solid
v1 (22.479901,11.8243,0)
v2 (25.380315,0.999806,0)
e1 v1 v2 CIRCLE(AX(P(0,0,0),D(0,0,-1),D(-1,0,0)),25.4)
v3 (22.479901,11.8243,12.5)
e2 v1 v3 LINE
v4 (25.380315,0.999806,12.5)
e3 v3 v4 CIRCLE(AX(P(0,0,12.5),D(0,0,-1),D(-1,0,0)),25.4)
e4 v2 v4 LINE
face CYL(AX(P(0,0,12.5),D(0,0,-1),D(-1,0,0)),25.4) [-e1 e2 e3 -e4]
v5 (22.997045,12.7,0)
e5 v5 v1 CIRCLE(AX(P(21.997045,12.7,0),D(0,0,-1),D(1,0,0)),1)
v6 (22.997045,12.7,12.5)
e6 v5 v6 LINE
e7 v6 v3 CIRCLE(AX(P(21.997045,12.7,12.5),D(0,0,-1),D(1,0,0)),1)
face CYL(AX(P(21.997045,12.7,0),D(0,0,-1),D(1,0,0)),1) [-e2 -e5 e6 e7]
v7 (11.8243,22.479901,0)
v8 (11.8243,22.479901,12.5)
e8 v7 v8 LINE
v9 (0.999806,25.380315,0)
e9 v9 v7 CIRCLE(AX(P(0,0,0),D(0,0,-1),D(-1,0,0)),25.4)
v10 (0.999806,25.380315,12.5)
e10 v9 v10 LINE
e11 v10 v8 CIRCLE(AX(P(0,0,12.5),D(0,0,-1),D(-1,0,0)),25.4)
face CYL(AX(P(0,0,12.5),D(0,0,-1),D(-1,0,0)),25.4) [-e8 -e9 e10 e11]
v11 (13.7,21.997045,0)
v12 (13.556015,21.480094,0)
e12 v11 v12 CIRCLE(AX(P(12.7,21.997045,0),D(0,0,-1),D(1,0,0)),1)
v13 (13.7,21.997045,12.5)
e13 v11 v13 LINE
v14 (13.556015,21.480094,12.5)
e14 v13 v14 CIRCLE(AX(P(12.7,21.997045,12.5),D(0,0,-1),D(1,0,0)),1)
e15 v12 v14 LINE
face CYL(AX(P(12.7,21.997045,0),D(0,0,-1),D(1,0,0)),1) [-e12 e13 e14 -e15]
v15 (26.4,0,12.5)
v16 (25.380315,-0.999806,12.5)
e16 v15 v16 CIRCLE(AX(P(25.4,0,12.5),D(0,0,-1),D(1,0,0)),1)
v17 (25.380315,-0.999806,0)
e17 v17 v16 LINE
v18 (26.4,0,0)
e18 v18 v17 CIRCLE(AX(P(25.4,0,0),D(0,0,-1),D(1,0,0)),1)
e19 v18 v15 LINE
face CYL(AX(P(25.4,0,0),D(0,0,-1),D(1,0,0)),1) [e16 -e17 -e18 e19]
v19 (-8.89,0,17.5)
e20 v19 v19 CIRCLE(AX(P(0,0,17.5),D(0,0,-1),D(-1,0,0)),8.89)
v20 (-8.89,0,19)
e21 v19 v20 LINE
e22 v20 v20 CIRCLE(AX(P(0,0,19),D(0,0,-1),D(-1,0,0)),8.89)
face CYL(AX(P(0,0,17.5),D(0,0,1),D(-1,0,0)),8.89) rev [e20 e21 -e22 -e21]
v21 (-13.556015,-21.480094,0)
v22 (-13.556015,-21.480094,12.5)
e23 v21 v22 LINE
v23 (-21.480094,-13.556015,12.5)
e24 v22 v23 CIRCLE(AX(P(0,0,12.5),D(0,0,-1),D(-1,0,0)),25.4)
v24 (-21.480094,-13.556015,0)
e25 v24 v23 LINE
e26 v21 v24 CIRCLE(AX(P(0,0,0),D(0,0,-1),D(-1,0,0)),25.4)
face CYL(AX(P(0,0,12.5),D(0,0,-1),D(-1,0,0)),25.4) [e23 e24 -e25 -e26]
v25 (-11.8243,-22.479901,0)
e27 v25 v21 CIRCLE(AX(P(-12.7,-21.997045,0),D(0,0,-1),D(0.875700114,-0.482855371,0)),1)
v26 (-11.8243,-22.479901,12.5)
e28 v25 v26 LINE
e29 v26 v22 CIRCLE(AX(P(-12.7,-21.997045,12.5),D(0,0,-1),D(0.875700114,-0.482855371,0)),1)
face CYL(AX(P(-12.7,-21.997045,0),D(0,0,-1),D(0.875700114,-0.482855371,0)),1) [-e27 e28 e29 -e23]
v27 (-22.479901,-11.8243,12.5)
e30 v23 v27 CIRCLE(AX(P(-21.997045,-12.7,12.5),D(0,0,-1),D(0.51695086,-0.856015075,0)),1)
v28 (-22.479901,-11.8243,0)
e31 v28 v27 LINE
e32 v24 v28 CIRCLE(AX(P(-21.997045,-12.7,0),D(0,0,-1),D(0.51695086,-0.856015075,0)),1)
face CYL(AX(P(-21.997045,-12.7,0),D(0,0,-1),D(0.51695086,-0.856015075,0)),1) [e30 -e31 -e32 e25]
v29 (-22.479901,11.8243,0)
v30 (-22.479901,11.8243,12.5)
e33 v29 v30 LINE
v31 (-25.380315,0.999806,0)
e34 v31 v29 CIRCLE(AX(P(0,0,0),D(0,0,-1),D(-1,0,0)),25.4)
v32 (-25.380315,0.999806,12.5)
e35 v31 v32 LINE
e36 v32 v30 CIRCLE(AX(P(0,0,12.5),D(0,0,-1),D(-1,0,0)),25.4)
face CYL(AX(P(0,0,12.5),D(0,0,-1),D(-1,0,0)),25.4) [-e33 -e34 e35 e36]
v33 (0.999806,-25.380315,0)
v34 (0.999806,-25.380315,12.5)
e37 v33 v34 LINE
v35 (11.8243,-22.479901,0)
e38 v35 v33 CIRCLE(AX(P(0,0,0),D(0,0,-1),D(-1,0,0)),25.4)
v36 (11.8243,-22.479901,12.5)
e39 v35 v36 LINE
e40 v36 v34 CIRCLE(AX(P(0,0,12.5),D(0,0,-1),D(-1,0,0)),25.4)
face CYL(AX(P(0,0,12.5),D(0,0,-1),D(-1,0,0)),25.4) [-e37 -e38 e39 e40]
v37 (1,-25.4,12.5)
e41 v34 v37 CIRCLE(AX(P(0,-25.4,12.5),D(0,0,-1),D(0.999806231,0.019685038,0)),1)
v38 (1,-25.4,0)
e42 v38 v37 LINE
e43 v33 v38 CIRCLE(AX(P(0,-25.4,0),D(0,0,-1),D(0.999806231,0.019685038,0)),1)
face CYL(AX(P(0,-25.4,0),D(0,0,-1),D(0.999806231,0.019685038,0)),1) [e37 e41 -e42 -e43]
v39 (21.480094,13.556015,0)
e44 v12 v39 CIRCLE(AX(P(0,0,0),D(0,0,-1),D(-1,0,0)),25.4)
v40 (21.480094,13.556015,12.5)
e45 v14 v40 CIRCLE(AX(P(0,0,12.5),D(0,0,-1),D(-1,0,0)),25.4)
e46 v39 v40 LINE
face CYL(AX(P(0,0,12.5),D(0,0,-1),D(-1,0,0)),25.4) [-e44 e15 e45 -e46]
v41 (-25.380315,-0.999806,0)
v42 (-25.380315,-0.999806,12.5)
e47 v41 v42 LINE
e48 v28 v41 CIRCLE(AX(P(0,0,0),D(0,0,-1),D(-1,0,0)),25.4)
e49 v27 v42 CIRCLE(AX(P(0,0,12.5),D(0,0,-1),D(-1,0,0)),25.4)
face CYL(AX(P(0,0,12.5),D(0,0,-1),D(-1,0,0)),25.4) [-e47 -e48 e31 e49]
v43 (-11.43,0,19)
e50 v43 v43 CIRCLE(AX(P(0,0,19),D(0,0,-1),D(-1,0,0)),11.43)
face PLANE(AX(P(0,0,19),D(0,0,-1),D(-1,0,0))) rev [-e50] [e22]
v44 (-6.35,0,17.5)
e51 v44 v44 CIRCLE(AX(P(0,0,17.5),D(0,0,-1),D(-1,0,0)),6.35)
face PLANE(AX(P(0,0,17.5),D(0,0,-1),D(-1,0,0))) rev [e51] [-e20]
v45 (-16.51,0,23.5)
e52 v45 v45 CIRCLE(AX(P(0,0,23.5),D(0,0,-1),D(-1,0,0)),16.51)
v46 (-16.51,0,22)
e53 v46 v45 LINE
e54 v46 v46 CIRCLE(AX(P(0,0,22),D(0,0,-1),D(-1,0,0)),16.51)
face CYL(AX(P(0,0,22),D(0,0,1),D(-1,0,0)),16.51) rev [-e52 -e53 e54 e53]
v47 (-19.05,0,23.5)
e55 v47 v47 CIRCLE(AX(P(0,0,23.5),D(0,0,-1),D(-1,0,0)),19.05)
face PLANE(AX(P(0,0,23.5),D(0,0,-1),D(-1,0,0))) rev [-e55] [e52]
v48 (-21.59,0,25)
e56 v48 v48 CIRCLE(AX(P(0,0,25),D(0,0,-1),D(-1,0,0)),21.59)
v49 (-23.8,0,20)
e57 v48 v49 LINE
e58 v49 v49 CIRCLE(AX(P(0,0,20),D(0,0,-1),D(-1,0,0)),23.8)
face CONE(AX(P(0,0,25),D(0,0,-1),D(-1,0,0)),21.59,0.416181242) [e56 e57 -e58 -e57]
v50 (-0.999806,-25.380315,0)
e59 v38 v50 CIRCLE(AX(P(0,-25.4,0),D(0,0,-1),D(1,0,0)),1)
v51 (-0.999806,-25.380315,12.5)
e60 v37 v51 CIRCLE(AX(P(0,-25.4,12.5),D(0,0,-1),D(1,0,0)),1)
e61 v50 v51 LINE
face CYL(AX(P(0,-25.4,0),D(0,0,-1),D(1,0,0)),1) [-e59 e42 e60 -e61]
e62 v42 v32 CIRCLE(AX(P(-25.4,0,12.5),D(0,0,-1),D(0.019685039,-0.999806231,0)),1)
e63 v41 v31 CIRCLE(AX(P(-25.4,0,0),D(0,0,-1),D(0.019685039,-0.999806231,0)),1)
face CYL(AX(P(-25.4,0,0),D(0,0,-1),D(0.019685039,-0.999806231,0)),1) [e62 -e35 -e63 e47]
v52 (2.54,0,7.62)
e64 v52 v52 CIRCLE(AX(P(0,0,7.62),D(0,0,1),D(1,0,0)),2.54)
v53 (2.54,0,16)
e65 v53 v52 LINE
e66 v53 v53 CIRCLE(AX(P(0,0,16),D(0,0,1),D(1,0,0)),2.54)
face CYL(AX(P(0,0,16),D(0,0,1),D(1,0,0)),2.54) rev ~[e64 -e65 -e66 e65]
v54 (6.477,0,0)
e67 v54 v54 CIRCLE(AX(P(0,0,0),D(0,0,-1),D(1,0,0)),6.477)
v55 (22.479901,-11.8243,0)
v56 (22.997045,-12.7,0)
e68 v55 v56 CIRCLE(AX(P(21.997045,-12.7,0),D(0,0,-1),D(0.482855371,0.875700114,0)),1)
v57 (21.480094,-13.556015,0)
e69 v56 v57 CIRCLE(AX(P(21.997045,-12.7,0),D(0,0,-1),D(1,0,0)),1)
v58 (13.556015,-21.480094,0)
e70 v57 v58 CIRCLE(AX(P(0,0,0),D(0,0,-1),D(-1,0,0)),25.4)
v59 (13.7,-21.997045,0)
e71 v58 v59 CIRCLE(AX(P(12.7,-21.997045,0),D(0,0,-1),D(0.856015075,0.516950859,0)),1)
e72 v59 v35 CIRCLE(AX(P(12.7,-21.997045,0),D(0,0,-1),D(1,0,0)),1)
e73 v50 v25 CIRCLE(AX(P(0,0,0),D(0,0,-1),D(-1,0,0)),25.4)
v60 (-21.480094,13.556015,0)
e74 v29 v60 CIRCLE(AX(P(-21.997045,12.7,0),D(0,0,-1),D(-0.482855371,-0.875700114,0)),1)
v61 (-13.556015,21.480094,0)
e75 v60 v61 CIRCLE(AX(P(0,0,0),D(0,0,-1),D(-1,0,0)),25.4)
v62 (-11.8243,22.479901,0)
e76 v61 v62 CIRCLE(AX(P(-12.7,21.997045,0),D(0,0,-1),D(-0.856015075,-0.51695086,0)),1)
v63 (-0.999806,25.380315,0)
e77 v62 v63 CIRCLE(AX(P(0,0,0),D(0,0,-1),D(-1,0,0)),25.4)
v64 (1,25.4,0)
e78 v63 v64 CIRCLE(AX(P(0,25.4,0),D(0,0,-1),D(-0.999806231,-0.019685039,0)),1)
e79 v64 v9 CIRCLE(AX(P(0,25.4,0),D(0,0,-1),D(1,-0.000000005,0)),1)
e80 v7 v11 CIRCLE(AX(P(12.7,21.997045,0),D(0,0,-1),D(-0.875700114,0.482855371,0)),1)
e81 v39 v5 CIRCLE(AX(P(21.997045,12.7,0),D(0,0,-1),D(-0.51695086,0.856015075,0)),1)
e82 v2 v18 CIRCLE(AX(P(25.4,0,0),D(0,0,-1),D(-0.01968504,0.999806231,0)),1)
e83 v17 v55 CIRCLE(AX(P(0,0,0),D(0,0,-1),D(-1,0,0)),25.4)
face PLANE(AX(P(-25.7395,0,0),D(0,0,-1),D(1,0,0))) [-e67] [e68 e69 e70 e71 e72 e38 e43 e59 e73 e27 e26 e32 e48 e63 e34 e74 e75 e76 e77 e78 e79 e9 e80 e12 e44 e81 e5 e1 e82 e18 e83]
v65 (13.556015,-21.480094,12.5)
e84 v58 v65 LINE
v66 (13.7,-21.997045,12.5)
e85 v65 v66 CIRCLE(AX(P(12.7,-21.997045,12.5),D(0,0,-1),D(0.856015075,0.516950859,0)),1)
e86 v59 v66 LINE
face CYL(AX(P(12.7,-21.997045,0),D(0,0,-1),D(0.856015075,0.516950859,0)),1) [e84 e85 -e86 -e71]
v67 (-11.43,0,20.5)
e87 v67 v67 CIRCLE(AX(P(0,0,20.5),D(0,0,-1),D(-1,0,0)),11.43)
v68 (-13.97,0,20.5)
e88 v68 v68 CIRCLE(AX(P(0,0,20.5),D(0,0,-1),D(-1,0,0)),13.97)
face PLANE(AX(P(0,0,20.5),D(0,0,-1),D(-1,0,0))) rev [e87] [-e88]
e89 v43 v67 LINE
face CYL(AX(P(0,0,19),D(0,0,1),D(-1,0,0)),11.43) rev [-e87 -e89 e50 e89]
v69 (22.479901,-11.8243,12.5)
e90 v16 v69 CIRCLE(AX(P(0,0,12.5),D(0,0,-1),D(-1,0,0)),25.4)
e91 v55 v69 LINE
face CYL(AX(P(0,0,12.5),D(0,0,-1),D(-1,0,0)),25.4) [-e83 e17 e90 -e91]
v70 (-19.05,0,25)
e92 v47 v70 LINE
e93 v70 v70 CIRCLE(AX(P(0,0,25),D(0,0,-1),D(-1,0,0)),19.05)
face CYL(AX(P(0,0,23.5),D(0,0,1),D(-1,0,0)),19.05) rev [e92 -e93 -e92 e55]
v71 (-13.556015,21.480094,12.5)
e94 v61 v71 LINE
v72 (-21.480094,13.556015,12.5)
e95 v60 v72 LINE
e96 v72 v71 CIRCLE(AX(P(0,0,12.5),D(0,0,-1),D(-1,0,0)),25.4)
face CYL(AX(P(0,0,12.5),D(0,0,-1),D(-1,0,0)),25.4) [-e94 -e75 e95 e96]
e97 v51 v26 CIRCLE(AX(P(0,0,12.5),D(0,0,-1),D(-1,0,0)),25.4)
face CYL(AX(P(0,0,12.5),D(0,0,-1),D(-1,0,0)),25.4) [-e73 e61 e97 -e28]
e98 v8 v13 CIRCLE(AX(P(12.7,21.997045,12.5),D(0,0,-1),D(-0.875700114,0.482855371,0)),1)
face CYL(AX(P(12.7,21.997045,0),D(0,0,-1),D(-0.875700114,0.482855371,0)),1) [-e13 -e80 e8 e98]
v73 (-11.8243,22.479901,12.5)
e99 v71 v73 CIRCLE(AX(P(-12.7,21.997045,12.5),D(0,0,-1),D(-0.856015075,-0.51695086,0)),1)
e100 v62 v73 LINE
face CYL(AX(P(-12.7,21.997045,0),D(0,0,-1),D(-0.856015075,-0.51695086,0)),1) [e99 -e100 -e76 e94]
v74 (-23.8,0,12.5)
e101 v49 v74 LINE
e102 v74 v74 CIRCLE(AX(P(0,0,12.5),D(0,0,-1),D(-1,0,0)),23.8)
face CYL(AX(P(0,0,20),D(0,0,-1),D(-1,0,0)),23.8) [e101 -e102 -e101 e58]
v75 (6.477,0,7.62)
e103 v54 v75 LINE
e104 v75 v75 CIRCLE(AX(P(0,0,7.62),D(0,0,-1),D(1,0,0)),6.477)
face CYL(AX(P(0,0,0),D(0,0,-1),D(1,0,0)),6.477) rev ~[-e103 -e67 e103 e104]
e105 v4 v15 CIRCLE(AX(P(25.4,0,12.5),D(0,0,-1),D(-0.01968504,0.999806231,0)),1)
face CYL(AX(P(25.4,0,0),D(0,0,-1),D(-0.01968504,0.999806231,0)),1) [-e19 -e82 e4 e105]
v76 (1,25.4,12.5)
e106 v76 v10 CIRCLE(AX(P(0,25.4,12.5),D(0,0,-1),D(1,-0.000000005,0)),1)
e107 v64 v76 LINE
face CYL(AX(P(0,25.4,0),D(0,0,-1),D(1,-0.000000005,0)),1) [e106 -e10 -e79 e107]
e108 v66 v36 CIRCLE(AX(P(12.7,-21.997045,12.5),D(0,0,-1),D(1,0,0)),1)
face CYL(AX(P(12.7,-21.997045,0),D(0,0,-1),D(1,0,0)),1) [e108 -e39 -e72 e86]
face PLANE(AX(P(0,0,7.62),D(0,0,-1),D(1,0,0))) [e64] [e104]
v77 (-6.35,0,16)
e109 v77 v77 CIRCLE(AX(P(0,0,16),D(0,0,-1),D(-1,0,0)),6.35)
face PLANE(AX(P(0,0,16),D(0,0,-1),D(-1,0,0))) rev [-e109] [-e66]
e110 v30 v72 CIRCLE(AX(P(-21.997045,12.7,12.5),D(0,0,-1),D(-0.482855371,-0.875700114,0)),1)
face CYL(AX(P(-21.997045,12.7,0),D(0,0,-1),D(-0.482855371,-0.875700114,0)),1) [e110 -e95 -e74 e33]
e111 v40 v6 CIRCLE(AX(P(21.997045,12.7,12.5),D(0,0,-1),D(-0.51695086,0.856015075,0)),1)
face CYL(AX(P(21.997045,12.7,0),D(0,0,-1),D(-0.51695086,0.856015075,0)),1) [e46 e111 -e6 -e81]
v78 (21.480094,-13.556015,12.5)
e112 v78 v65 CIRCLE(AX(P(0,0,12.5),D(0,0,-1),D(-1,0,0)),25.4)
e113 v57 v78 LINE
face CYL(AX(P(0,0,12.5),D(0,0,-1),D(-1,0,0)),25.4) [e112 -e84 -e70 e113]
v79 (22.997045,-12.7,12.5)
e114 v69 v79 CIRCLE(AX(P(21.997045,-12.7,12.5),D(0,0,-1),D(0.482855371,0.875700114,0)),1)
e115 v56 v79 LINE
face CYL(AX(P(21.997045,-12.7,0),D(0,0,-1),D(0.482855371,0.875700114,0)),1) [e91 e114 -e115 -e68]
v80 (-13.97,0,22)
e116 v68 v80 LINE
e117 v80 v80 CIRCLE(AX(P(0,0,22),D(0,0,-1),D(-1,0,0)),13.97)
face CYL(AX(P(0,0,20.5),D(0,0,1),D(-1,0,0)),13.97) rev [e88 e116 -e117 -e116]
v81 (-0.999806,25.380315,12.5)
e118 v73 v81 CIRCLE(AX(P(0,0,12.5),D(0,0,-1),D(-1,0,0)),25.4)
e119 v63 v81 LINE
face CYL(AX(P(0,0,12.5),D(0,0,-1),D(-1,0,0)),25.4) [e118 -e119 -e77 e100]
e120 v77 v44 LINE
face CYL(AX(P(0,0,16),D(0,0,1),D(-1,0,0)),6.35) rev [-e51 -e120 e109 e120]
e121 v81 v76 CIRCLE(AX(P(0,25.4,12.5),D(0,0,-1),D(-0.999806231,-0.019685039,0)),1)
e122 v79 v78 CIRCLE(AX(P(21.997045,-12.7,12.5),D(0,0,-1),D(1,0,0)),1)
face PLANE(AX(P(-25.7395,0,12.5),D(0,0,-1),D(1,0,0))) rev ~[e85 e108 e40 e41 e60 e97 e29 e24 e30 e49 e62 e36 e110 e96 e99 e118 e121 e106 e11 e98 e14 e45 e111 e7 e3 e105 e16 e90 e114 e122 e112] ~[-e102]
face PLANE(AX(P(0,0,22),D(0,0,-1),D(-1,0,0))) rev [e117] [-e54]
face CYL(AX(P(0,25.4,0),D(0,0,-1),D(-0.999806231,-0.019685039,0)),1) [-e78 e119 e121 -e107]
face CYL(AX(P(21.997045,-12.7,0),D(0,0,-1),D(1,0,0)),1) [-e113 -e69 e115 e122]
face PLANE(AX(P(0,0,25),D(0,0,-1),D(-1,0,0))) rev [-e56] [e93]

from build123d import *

# Parameters (mm, degrees)
F3_DEPTH = 12.5
F2_R     = 6.477
F4_DEPTH = 7.62
F5_R     = 2.54
F6_DEPTH = 25.4


with BuildPart() as f1:
    # F0 (on Front) → F1 (revolve)
    with BuildSketch(Plane.XZ):
        Polygon((-25.4, 0), (0, 0), (0, 16), (-6.35, 16), (-6.35, 17.5), (-8.89, 17.5), (-8.89, 19), (-11.43, 19), (-11.43, 20.5), (-13.97, 20.5), (-13.97, 22), (-16.51, 22), (-16.51, 23.5), (-19.05, 23.5), (-19.05, 25), (-21.59, 25), (-23.8, 20), (-23.8, 12.5), (-25.4, 12.5), align=None)
    revolve(axis=Axis((0, 0, 8), (0, 0, -1)))

    # F2 (on face) → F3 (join)
    with BuildSketch(Plane(origin=(0, 0, 0), x_dir=(1, 0, 0), z_dir=(0, 0, -1))):
        with BuildLine():
            ThreePointArc((-25.3803149606, -0.9998062308), (-25.4, 0), (-25.3803149606, 0.9998062308))
            ThreePointArc((-25.3803149606, 0.9998062308), (-26.4, 0), (-25.3803149606, -0.9998062308))
        make_face()
        with BuildLine():
            ThreePointArc((-21.4800943965, 13.5560150751), (-21.9970452561, 12.7), (-22.4799006274, 11.8242998855))
            ThreePointArc((-22.4799006274, 11.8242998855), (-21.4885451928, 11.8389380477), (-20.9970452561, 12.7))
            ThreePointArc((-20.9970452561, 12.7), (-21.1261403074, 13.1914514932), (-21.4800943965, 13.5560150751))
        make_face()
        with BuildLine():
            ThreePointArc((-21.4800943965, 13.5560150751), (-22.8630706599, 13.2), (-22.4799006274, 11.8242998855))
            ThreePointArc((-22.4799006274, 11.8242998855), (-21.9970452561, 12.7), (-21.4800943965, 13.5560150751))
        make_face()
        with BuildLine():
            ThreePointArc((-21.4800943965, -13.5560150751), (-21.9970452561, -12.7), (-22.4799006274, -11.8242998855))
            ThreePointArc((-22.4799006274, -11.8242998855), (-22.8630706599, -13.2), (-21.4800943965, -13.5560150751))
        make_face()
        with BuildLine():
            ThreePointArc((-11.8242998855, 22.4799006274), (-12.7, 21.9970452561), (-13.5560150751, 21.4800943965))
            ThreePointArc((-13.5560150751, 21.4800943965), (-12.4316858884, 21.0337137776), (-11.7, 21.9970452561))
            ThreePointArc((-11.7, 21.9970452561), (-11.7315734115, 22.2463441586), (-11.8242998855, 22.4799006274))
        make_face()
        with BuildLine():
            ThreePointArc((-11.8242998855, 22.4799006274), (-13.2, 22.8630706599), (-13.5560150751, 21.4800943965))
            ThreePointArc((-13.5560150751, 21.4800943965), (-12.7, 21.9970452561), (-11.8242998855, 22.4799006274))
        make_face()
        with BuildLine():
            ThreePointArc((-11.8242998855, -22.4799006274), (-12.7, -21.9970452561), (-13.5560150751, -21.4800943965))
            ThreePointArc((-13.5560150751, -21.4800943965), (-13.2, -22.8630706599), (-11.8242998855, -22.4799006274))
        make_face()
        with BuildLine():
            ThreePointArc((0.9998062308, 25.3803149606), (0, 25.4), (-0.9998062308, 25.3803149606))
            ThreePointArc((-0.9998062308, 25.3803149606), (0, 24.4), (0.9998062308, 25.3803149606))
        make_face()
        with BuildLine():
            ThreePointArc((1, 25.4), (-0.0098429965, 26.3999515565), (-0.9998062308, 25.3803149606))
            ThreePointArc((-0.9998062308, 25.3803149606), (0, 25.4), (0.9998062308, 25.3803149606))
            ThreePointArc((0.9998062308, 25.3803149606), (0.9999515565, 25.3901570035), (1, 25.4))
        make_face()
        with BuildLine():
            ThreePointArc((0.9998062308, -25.3803149606), (0, -25.4), (-0.9998062308, -25.3803149606))
            ThreePointArc((-0.9998062308, -25.3803149606), (-0.0098429965, -26.3999515565), (1, -25.4))
            ThreePointArc((1, -25.4), (0.9999515565, -25.3901570035), (0.9998062308, -25.3803149606))
        make_face()
        with BuildLine():
            ThreePointArc((13.5560150751, 21.4800943965), (12.7, 21.9970452561), (11.8242998855, 22.4799006274))
            ThreePointArc((11.8242998855, 22.4799006274), (12.2, 21.1310198523), (13.5560150751, 21.4800943965))
        make_face()
        with BuildLine():
            ThreePointArc((13.7, 21.9970452561), (12.9492989025, 22.9654718446), (11.8242998855, 22.4799006274))
            ThreePointArc((11.8242998855, 22.4799006274), (12.7, 21.9970452561), (13.5560150751, 21.4800943965))
            ThreePointArc((13.5560150751, 21.4800943965), (13.6633314785, 21.7287311446), (13.7, 21.9970452561))
        make_face()
        with BuildLine():
            ThreePointArc((13.5560150751, -21.4800943965), (12.7, -21.9970452561), (11.8242998855, -22.4799006274))
            ThreePointArc((11.8242998855, -22.4799006274), (12.9492989025, -22.9654718446), (13.7, -21.9970452561))
            ThreePointArc((13.7, -21.9970452561), (13.6633314785, -21.7287311446), (13.5560150751, -21.4800943965))
        make_face()
        with BuildLine():
            ThreePointArc((22.4799006274, 11.8242998855), (21.9970452561, 12.7), (21.4800943965, 13.5560150751))
            ThreePointArc((21.4800943965, 13.5560150751), (21.1310198523, 12.2), (22.4799006274, 11.8242998855))
        make_face()
        with BuildLine():
            ThreePointArc((22.9970452561, 12.7), (22.4884967494, 13.5709049488), (21.4800943965, 13.5560150751))
            ThreePointArc((21.4800943965, 13.5560150751), (21.9970452561, 12.7), (22.4799006274, 11.8242998855))
            ThreePointArc((22.4799006274, 11.8242998855), (22.8581072084, 12.1914999367), (22.9970452561, 12.7))
        make_face()
        with BuildLine():
            ThreePointArc((22.4799006274, -11.8242998855), (21.9970452561, -12.7), (21.4800943965, -13.5560150751))
            ThreePointArc((21.4800943965, -13.5560150751), (22.4884967494, -13.5709049488), (22.9970452561, -12.7))
            ThreePointArc((22.9970452561, -12.7), (22.8581072084, -12.1914999367), (22.4799006274, -11.8242998855))
        make_face()
        with BuildLine():
            ThreePointArc((26.4, 0), (26.1001124769, 0.7140325761), (25.3803149606, 0.9998062308))
            ThreePointArc((25.3803149606, 0.9998062308), (25.3950782633, 0.5), (25.4, 0))
            ThreePointArc((25.4, 0), (25.3950782633, -0.5), (25.3803149606, -0.9998062308))
            ThreePointArc((25.3803149606, -0.9998062308), (26.1001124769, -0.7140325761), (26.4, 0))
        make_face()
    extrude(amount=-F3_DEPTH)

    # F2 (on face) → F4 (cut)
    with BuildSketch(Plane(origin=(0, 0, 0), x_dir=(1, 0, 0), z_dir=(0, 0, -1))):
        Circle(F2_R)
    extrude(amount=-F4_DEPTH, mode=Mode.SUBTRACT)

    # F5 (on face) → F6 (cut)
    with BuildSketch(Plane.XY.offset(16)):
        Circle(F5_R)
    extrude(amount=-F6_DEPTH, mode=Mode.SUBTRACT)


solid = f1.part
